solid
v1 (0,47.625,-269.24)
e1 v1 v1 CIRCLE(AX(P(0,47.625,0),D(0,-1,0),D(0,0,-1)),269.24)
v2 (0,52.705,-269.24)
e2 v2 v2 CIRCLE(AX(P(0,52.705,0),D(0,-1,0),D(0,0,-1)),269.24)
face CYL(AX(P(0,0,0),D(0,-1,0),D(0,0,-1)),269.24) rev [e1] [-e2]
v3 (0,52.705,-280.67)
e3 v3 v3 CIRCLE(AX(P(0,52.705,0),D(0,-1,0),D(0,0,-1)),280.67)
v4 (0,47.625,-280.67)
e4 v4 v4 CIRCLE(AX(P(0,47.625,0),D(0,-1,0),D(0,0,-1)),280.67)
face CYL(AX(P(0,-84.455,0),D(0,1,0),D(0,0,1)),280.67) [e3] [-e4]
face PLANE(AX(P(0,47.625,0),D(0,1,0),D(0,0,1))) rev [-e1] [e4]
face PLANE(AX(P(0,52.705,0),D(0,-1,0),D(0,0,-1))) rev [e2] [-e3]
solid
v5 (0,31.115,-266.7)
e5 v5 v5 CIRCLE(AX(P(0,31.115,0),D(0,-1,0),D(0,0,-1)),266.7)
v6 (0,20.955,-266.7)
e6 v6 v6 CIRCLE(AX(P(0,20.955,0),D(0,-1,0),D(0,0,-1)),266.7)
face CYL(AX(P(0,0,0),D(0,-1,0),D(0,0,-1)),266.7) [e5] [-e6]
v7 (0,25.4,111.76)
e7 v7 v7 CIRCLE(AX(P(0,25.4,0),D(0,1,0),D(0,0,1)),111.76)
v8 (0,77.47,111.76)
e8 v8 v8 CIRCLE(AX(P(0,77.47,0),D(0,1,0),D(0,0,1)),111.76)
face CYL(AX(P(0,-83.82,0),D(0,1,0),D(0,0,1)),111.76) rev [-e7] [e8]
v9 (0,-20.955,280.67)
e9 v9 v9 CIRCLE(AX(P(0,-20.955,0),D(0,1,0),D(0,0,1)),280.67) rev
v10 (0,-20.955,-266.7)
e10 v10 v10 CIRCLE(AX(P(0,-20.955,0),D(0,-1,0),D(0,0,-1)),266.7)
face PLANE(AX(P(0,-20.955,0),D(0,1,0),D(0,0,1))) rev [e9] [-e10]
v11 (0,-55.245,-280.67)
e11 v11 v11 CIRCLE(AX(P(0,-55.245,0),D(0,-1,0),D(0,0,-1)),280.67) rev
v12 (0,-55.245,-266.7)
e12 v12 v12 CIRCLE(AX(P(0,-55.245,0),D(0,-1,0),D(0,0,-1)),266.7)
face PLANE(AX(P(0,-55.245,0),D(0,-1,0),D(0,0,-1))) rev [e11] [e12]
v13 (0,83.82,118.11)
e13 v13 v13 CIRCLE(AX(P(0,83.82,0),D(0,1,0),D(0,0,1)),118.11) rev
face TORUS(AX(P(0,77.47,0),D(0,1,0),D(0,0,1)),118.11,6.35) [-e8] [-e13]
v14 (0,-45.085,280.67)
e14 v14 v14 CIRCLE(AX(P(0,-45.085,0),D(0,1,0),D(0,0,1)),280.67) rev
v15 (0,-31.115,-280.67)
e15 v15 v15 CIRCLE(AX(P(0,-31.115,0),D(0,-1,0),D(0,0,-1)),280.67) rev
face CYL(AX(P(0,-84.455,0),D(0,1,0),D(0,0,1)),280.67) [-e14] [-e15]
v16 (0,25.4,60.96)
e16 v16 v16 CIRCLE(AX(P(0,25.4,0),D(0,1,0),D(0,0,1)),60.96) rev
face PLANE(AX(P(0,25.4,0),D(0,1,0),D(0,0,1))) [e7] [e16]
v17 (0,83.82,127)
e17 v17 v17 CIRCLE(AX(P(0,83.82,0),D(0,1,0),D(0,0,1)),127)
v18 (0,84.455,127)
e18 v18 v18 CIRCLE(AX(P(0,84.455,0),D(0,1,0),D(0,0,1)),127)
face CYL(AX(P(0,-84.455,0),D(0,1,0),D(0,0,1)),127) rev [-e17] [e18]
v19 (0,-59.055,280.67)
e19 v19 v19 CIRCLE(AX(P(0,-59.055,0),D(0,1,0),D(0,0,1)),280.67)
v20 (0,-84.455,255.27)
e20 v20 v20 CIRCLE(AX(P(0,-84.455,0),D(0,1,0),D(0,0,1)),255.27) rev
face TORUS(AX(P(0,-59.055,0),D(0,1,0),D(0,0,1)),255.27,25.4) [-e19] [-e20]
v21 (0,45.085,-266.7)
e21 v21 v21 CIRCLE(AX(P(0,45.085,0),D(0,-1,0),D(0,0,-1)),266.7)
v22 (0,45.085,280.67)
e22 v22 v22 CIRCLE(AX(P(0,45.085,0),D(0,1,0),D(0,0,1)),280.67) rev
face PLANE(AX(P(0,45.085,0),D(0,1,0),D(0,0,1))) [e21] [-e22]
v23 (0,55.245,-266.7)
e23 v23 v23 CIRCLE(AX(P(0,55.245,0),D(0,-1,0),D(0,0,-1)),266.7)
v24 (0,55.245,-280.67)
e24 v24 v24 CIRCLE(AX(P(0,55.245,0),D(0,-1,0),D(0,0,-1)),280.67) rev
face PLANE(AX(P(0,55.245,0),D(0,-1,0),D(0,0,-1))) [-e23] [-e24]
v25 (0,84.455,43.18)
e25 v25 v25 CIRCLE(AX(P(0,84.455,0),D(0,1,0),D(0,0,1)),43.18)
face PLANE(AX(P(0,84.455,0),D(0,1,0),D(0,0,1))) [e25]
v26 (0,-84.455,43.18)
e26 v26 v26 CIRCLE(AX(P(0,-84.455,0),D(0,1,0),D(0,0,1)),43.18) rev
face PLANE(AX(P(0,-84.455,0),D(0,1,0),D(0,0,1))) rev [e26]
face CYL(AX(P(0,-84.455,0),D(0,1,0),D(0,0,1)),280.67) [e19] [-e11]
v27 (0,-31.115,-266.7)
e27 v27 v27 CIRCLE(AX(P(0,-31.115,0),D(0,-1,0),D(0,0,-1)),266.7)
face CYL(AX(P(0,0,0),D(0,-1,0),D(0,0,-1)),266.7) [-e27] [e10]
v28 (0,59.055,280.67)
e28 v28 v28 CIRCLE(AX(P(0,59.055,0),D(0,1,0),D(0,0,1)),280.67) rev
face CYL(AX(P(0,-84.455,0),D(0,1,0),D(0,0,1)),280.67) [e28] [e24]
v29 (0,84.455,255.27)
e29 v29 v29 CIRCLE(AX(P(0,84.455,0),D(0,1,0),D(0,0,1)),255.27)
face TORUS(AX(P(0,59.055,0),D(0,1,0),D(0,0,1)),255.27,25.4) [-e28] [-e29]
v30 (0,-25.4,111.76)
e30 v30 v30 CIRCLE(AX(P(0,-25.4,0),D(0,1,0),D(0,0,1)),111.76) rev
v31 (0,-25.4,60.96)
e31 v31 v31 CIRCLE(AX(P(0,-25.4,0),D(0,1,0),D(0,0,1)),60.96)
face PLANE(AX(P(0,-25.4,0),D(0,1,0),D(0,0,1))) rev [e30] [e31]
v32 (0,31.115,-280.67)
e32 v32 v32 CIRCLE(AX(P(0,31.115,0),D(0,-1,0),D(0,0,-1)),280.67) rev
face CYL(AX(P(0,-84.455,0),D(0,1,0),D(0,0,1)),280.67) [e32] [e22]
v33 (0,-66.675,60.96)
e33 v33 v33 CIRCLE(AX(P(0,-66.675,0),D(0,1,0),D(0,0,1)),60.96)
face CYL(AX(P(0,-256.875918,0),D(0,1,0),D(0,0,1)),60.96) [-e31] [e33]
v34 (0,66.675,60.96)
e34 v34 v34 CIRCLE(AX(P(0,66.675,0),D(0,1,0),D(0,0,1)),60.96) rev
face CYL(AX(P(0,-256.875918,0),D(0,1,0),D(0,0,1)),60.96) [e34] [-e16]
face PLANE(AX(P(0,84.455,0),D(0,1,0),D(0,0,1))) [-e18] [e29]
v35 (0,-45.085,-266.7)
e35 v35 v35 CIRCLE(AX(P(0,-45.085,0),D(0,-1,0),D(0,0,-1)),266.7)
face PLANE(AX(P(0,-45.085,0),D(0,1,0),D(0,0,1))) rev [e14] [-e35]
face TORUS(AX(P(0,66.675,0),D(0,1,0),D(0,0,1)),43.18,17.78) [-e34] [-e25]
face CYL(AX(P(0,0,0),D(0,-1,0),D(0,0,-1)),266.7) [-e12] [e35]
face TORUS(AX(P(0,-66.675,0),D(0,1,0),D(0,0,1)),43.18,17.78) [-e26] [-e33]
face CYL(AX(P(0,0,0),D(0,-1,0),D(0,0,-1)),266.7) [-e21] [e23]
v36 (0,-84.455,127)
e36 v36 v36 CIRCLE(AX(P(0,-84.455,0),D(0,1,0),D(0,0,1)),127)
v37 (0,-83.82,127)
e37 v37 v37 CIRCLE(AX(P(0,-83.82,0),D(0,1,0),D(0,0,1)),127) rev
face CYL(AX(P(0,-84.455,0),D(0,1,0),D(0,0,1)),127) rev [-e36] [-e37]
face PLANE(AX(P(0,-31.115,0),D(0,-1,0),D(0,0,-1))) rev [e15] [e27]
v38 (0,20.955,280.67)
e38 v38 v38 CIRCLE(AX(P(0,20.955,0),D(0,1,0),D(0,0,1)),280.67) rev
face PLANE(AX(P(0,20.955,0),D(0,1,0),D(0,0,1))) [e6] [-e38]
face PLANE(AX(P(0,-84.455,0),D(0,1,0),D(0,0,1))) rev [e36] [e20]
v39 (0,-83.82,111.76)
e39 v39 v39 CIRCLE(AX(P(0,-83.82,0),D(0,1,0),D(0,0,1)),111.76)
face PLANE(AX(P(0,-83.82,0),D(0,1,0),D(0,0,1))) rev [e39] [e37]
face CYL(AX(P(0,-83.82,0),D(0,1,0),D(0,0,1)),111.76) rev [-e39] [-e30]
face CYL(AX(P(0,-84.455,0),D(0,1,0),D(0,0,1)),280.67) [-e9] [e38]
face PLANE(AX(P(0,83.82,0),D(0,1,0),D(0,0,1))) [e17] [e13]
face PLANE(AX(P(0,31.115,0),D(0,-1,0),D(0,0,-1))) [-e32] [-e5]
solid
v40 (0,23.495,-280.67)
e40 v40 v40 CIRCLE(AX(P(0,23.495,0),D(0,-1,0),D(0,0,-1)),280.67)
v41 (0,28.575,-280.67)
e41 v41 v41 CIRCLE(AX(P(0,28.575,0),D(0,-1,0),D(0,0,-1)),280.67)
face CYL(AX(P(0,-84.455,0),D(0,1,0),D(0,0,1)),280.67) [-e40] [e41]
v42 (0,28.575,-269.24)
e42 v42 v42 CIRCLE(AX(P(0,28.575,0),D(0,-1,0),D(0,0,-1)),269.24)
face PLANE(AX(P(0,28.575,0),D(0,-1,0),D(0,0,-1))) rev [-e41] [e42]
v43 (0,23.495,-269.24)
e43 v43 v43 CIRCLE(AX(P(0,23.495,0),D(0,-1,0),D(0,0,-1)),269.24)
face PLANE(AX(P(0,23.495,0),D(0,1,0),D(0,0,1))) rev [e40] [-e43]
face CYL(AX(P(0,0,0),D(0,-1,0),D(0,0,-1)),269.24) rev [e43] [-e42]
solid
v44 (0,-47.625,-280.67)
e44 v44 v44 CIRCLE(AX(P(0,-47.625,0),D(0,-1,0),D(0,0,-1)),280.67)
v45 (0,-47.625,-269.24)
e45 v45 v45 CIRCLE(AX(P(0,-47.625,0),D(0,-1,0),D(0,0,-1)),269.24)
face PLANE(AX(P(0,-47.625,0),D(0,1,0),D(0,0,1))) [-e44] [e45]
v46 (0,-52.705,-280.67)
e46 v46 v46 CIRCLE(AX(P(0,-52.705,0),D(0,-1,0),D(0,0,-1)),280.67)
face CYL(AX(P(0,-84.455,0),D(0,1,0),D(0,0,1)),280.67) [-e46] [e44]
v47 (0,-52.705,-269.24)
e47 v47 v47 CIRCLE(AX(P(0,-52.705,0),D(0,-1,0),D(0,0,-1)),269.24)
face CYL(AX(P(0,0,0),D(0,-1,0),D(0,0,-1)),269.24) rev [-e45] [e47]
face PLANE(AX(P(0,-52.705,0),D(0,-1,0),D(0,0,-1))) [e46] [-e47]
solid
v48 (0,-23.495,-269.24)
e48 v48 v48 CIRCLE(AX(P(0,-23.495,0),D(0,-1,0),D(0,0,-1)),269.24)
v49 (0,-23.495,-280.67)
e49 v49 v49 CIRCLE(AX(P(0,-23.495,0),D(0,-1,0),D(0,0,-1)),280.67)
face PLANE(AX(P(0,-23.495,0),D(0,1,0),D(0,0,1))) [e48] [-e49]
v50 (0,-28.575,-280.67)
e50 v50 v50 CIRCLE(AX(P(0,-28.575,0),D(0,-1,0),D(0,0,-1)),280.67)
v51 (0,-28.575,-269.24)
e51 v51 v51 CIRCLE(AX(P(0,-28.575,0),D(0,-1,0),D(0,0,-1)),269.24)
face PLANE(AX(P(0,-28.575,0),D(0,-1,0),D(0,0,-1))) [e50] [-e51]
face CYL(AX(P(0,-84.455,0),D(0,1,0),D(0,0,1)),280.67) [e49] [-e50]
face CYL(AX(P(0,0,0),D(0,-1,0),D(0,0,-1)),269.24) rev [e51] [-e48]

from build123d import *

# Parameters (mm, degrees)
BOSS_EXTRUDE1_DEPTH              = 84.455
BOSS_EXTRUDE1_DEPTH_BACK         = 84.455
SKETCH1_R                        = 280.67
SKETCH1_R_2                      = 127
CUT_REVOLVE_THIN1_START          = -55.245
CUT_REVOLVE_THIN1_OUTLINE_R      = 280.67
CUT_REVOLVE_THIN1_OUTLINE_R_2    = 266.7
CUT_REVOLVE_THIN1_DEPTH          = 2.54
CUT_REVOLVE_THIN1_START_2        = -47.625
CUT_REVOLVE_THIN1_2_OUTLINE_R    = 280.67
CUT_REVOLVE_THIN1_2_OUTLINE_R_2  = 266.7
CUT_REVOLVE_THIN1_2_DEPTH        = 2.54
CUT_REVOLVE_THIN1_START_3        = -31.115
CUT_REVOLVE_THIN1_3_OUTLINE_R    = 280.67
CUT_REVOLVE_THIN1_3_OUTLINE_R_2  = 266.7
CUT_REVOLVE_THIN1_3_DEPTH        = 2.54
CUT_REVOLVE_THIN1_START_4        = -23.495
CUT_REVOLVE_THIN1_4_OUTLINE_R    = 280.67
CUT_REVOLVE_THIN1_4_OUTLINE_R_2  = 266.7
CUT_REVOLVE_THIN1_4_DEPTH        = 2.54
CUT_REVOLVE_THIN1_START_5        = 20.955
CUT_REVOLVE_THIN1_5_OUTLINE_R    = 280.67
CUT_REVOLVE_THIN1_5_OUTLINE_R_2  = 266.7
CUT_REVOLVE_THIN1_5_DEPTH        = 2.54
CUT_REVOLVE_THIN1_START_6        = 28.575
CUT_REVOLVE_THIN1_6_OUTLINE_R    = 280.67
CUT_REVOLVE_THIN1_6_OUTLINE_R_2  = 266.7
CUT_REVOLVE_THIN1_6_DEPTH        = 2.54
CUT_REVOLVE_THIN1_START_7        = 45.085
CUT_REVOLVE_THIN1_7_OUTLINE_R    = 280.67
CUT_REVOLVE_THIN1_7_OUTLINE_R_2  = 266.7
CUT_REVOLVE_THIN1_7_DEPTH        = 2.54
CUT_REVOLVE_THIN1_START_8        = 52.705
CUT_REVOLVE_THIN1_8_OUTLINE_R    = 280.67
CUT_REVOLVE_THIN1_8_OUTLINE_R_2  = 266.7
CUT_REVOLVE_THIN1_8_DEPTH        = 2.54
CUT_REVOLVE_THIN1_START_9        = -52.705
CUT_REVOLVE_THIN1_9_OUTLINE_R    = 269.24
CUT_REVOLVE_THIN1_9_OUTLINE_R_2  = 266.7
CUT_REVOLVE_THIN1_9_DEPTH        = 5.08
CUT_REVOLVE_THIN1_START_10       = -28.575
CUT_REVOLVE_THIN1_10_OUTLINE_R   = 269.24
CUT_REVOLVE_THIN1_10_OUTLINE_R_2 = 266.7
CUT_REVOLVE_THIN1_10_DEPTH       = 5.08
CUT_REVOLVE_THIN1_START_11       = 23.495
CUT_REVOLVE_THIN1_11_OUTLINE_R   = 269.24
CUT_REVOLVE_THIN1_11_OUTLINE_R_2 = 266.7
CUT_REVOLVE_THIN1_11_DEPTH       = 5.08
CUT_REVOLVE_THIN1_START_12       = 47.625
CUT_REVOLVE_THIN1_12_OUTLINE_R   = 269.24
CUT_REVOLVE_THIN1_12_OUTLINE_R_2 = 266.7
CUT_REVOLVE_THIN1_12_DEPTH       = 5.08
FILLET1_R                        = 25.4
BOSS_EXTRUDE3_DEPTH              = 84.455
BOSS_EXTRUDE3_DEPTH_BACK         = 84.455
SKETCH4_R                        = 60.96
BOSS_EXTRUDE4_DEPTH              = 25.4
BOSS_EXTRUDE4_DEPTH_BACK         = 25.4
SKETCH4_5_R                      = 111.76
SKETCH4_5_R_2                    = 60.96
FILLET2_R                        = 17.78
BOSS_EXTRUDE5_DEPTH              = 83.82
BOSS_EXTRUDE5_DEPTH_BACK         = 83.82
SKETCH4_6_R                      = 127
SKETCH4_6_R_2                    = 111.76
FILLET3_R                        = 6.35


# Read off the part's stored shape, not the designer's step: Cut-Revolve-Thin1
with BuildPart() as part:
    # Sketch1 → Boss-Extrude1 (new, two sides: drawn at the far end of the back side and taken through both)
    with BuildSketch(Plane(origin=(0, 0, 0), x_dir=(1, 0, 0), z_dir=(0, 1, 0)).offset(-BOSS_EXTRUDE1_DEPTH_BACK)):
        with Locations(Location((0, 0, 0), (0, 0, 270))):
            Circle(SKETCH1_R)
        with Locations(Location((0, 0, 0), (0, 0, 270))):
            Circle(SKETCH1_R_2, mode=Mode.SUBTRACT)
    extrude(amount=BOSS_EXTRUDE1_DEPTH + BOSS_EXTRUDE1_DEPTH_BACK)

    # Cut-Revolve-Thin1 outline → Cut-Revolve-Thin1 (cut)
    with BuildSketch(Plane(origin=(0, 0, 0), x_dir=(1, 0, 0), z_dir=(0, 1, 0)).offset(CUT_REVOLVE_THIN1_START)):
        Circle(CUT_REVOLVE_THIN1_OUTLINE_R)
        Circle(CUT_REVOLVE_THIN1_OUTLINE_R_2, mode=Mode.SUBTRACT)
    extrude(amount=CUT_REVOLVE_THIN1_DEPTH, mode=Mode.SUBTRACT)

    # Cut-Revolve-Thin1 2 outline → Cut-Revolve-Thin1 2 (cut)
    with BuildSketch(Plane(origin=(0, 0, 0), x_dir=(1, 0, 0), z_dir=(0, 1, 0)).offset(CUT_REVOLVE_THIN1_START_2)):
        Circle(CUT_REVOLVE_THIN1_2_OUTLINE_R)
        Circle(CUT_REVOLVE_THIN1_2_OUTLINE_R_2, mode=Mode.SUBTRACT)
    extrude(amount=CUT_REVOLVE_THIN1_2_DEPTH, mode=Mode.SUBTRACT)

    # Cut-Revolve-Thin1 3 outline → Cut-Revolve-Thin1 3 (cut)
    with BuildSketch(Plane(origin=(0, 0, 0), x_dir=(1, 0, 0), z_dir=(0, 1, 0)).offset(CUT_REVOLVE_THIN1_START_3)):
        Circle(CUT_REVOLVE_THIN1_3_OUTLINE_R)
        Circle(CUT_REVOLVE_THIN1_3_OUTLINE_R_2, mode=Mode.SUBTRACT)
    extrude(amount=CUT_REVOLVE_THIN1_3_DEPTH, mode=Mode.SUBTRACT)

    # Cut-Revolve-Thin1 4 outline → Cut-Revolve-Thin1 4 (cut)
    with BuildSketch(Plane(origin=(0, 0, 0), x_dir=(1, 0, 0), z_dir=(0, 1, 0)).offset(CUT_REVOLVE_THIN1_START_4)):
        Circle(CUT_REVOLVE_THIN1_4_OUTLINE_R)
        Circle(CUT_REVOLVE_THIN1_4_OUTLINE_R_2, mode=Mode.SUBTRACT)
    extrude(amount=CUT_REVOLVE_THIN1_4_DEPTH, mode=Mode.SUBTRACT)

    # Cut-Revolve-Thin1 5 outline → Cut-Revolve-Thin1 5 (cut)
    with BuildSketch(Plane(origin=(0, 0, 0), x_dir=(1, 0, 0), z_dir=(0, 1, 0)).offset(CUT_REVOLVE_THIN1_START_5)):
        Circle(CUT_REVOLVE_THIN1_5_OUTLINE_R)
        Circle(CUT_REVOLVE_THIN1_5_OUTLINE_R_2, mode=Mode.SUBTRACT)
    extrude(amount=CUT_REVOLVE_THIN1_5_DEPTH, mode=Mode.SUBTRACT)

    # Cut-Revolve-Thin1 6 outline → Cut-Revolve-Thin1 6 (cut)
    with BuildSketch(Plane(origin=(0, 0, 0), x_dir=(1, 0, 0), z_dir=(0, 1, 0)).offset(CUT_REVOLVE_THIN1_START_6)):
        Circle(CUT_REVOLVE_THIN1_6_OUTLINE_R)
        Circle(CUT_REVOLVE_THIN1_6_OUTLINE_R_2, mode=Mode.SUBTRACT)
    extrude(amount=CUT_REVOLVE_THIN1_6_DEPTH, mode=Mode.SUBTRACT)

    # Cut-Revolve-Thin1 7 outline → Cut-Revolve-Thin1 7 (cut)
    with BuildSketch(Plane(origin=(0, 0, 0), x_dir=(1, 0, 0), z_dir=(0, 1, 0)).offset(CUT_REVOLVE_THIN1_START_7)):
        Circle(CUT_REVOLVE_THIN1_7_OUTLINE_R)
        Circle(CUT_REVOLVE_THIN1_7_OUTLINE_R_2, mode=Mode.SUBTRACT)
    extrude(amount=CUT_REVOLVE_THIN1_7_DEPTH, mode=Mode.SUBTRACT)

    # Cut-Revolve-Thin1 8 outline → Cut-Revolve-Thin1 8 (cut)
    with BuildSketch(Plane(origin=(0, 0, 0), x_dir=(1, 0, 0), z_dir=(0, 1, 0)).offset(CUT_REVOLVE_THIN1_START_8)):
        Circle(CUT_REVOLVE_THIN1_8_OUTLINE_R)
        Circle(CUT_REVOLVE_THIN1_8_OUTLINE_R_2, mode=Mode.SUBTRACT)
    extrude(amount=CUT_REVOLVE_THIN1_8_DEPTH, mode=Mode.SUBTRACT)

    # Cut-Revolve-Thin1 9 outline → Cut-Revolve-Thin1 9 (cut)
    with BuildSketch(Plane(origin=(0, 0, 0), x_dir=(1, 0, 0), z_dir=(0, 1, 0)).offset(CUT_REVOLVE_THIN1_START_9)):
        Circle(CUT_REVOLVE_THIN1_9_OUTLINE_R)
        Circle(CUT_REVOLVE_THIN1_9_OUTLINE_R_2, mode=Mode.SUBTRACT)
    extrude(amount=CUT_REVOLVE_THIN1_9_DEPTH, mode=Mode.SUBTRACT)

    # Cut-Revolve-Thin1 10 outline → Cut-Revolve-Thin1 10 (cut)
    with BuildSketch(Plane(origin=(0, 0, 0), x_dir=(1, 0, 0), z_dir=(0, 1, 0)).offset(CUT_REVOLVE_THIN1_START_10)):
        Circle(CUT_REVOLVE_THIN1_10_OUTLINE_R)
        Circle(CUT_REVOLVE_THIN1_10_OUTLINE_R_2, mode=Mode.SUBTRACT)
    extrude(amount=CUT_REVOLVE_THIN1_10_DEPTH, mode=Mode.SUBTRACT)

    # Cut-Revolve-Thin1 11 outline → Cut-Revolve-Thin1 11 (cut)
    with BuildSketch(Plane(origin=(0, 0, 0), x_dir=(1, 0, 0), z_dir=(0, 1, 0)).offset(CUT_REVOLVE_THIN1_START_11)):
        Circle(CUT_REVOLVE_THIN1_11_OUTLINE_R)
        Circle(CUT_REVOLVE_THIN1_11_OUTLINE_R_2, mode=Mode.SUBTRACT)
    extrude(amount=CUT_REVOLVE_THIN1_11_DEPTH, mode=Mode.SUBTRACT)

    # Cut-Revolve-Thin1 12 outline → Cut-Revolve-Thin1 12 (cut)
    with BuildSketch(Plane(origin=(0, 0, 0), x_dir=(1, 0, 0), z_dir=(0, 1, 0)).offset(CUT_REVOLVE_THIN1_START_12)):
        Circle(CUT_REVOLVE_THIN1_12_OUTLINE_R)
        Circle(CUT_REVOLVE_THIN1_12_OUTLINE_R_2, mode=Mode.SUBTRACT)
    extrude(amount=CUT_REVOLVE_THIN1_12_DEPTH, mode=Mode.SUBTRACT)

    # Fillet1
    fillet1_edges = [part.edges().sort_by_distance(p)[0] for p in [
        (0, -84.455, -280.67),
        (0, 84.455, -280.67),
    ]]
    fillet(fillet1_edges, radius=FILLET1_R)



with BuildPart() as body_2:
    # Sketch4 → Boss-Extrude3 (new, two sides: drawn at the far end of the back side and taken through both)
    with BuildSketch(Plane(origin=(0, 0, 0), x_dir=(1, 0, 0), z_dir=(0, 1, 0)).offset(-BOSS_EXTRUDE3_DEPTH_BACK)):
        with Locations(Location((0, 0, 0), (0, 0, 270))):
            Circle(SKETCH4_R)
    extrude(amount=BOSS_EXTRUDE3_DEPTH + BOSS_EXTRUDE3_DEPTH_BACK)

    # Sketch4<5> → Boss-Extrude4 (add, two sides: drawn at the far end of the back side and taken through both)
    with BuildSketch(Plane(origin=(0, 0, 0), x_dir=(1, 0, 0), z_dir=(0, 1, 0)).offset(-BOSS_EXTRUDE4_DEPTH_BACK)):
        with Locations(Location((0, 0, 0), (0, 0, 270))):
            Circle(SKETCH4_5_R)
        with Locations(Location((0, 0, 0), (0, 0, 270))):
            Circle(SKETCH4_5_R_2, mode=Mode.SUBTRACT)
    extrude(amount=BOSS_EXTRUDE4_DEPTH + BOSS_EXTRUDE4_DEPTH_BACK)

    # Fillet2
    fillet2_edges = [body_2.edges().sort_by_distance(p)[0] for p in [
        (0, 84.455, -60.96),
        (0, -84.455, -60.96),
    ]]
    fillet(fillet2_edges, radius=FILLET2_R)


with BuildPart() as part_1:
    add(part.part)

    add(body_2.part)  # Boss-Extrude5 merges body 2
    # Sketch4<6> → Boss-Extrude5 (add, two sides: drawn at the far end of the back side and taken through both)
    with BuildSketch(Plane(origin=(0, 0, 0), x_dir=(1, 0, 0), z_dir=(0, 1, 0)).offset(-BOSS_EXTRUDE5_DEPTH_BACK)):
        with Locations(Location((0, 0, 0), (0, 0, 270))):
            Circle(SKETCH4_6_R)
        with Locations(Location((0, 0, 0), (0, 0, 270))):
            Circle(SKETCH4_6_R_2, mode=Mode.SUBTRACT)
    extrude(amount=BOSS_EXTRUDE5_DEPTH + BOSS_EXTRUDE5_DEPTH_BACK)

    # Fillet3
    fillet3_edges = [part_1.edges().sort_by_distance(p)[0] for p in [
        (0, 83.82, -111.76),
    ]]
    fillet(fillet3_edges, radius=FILLET3_R)


solid = part_1.part
